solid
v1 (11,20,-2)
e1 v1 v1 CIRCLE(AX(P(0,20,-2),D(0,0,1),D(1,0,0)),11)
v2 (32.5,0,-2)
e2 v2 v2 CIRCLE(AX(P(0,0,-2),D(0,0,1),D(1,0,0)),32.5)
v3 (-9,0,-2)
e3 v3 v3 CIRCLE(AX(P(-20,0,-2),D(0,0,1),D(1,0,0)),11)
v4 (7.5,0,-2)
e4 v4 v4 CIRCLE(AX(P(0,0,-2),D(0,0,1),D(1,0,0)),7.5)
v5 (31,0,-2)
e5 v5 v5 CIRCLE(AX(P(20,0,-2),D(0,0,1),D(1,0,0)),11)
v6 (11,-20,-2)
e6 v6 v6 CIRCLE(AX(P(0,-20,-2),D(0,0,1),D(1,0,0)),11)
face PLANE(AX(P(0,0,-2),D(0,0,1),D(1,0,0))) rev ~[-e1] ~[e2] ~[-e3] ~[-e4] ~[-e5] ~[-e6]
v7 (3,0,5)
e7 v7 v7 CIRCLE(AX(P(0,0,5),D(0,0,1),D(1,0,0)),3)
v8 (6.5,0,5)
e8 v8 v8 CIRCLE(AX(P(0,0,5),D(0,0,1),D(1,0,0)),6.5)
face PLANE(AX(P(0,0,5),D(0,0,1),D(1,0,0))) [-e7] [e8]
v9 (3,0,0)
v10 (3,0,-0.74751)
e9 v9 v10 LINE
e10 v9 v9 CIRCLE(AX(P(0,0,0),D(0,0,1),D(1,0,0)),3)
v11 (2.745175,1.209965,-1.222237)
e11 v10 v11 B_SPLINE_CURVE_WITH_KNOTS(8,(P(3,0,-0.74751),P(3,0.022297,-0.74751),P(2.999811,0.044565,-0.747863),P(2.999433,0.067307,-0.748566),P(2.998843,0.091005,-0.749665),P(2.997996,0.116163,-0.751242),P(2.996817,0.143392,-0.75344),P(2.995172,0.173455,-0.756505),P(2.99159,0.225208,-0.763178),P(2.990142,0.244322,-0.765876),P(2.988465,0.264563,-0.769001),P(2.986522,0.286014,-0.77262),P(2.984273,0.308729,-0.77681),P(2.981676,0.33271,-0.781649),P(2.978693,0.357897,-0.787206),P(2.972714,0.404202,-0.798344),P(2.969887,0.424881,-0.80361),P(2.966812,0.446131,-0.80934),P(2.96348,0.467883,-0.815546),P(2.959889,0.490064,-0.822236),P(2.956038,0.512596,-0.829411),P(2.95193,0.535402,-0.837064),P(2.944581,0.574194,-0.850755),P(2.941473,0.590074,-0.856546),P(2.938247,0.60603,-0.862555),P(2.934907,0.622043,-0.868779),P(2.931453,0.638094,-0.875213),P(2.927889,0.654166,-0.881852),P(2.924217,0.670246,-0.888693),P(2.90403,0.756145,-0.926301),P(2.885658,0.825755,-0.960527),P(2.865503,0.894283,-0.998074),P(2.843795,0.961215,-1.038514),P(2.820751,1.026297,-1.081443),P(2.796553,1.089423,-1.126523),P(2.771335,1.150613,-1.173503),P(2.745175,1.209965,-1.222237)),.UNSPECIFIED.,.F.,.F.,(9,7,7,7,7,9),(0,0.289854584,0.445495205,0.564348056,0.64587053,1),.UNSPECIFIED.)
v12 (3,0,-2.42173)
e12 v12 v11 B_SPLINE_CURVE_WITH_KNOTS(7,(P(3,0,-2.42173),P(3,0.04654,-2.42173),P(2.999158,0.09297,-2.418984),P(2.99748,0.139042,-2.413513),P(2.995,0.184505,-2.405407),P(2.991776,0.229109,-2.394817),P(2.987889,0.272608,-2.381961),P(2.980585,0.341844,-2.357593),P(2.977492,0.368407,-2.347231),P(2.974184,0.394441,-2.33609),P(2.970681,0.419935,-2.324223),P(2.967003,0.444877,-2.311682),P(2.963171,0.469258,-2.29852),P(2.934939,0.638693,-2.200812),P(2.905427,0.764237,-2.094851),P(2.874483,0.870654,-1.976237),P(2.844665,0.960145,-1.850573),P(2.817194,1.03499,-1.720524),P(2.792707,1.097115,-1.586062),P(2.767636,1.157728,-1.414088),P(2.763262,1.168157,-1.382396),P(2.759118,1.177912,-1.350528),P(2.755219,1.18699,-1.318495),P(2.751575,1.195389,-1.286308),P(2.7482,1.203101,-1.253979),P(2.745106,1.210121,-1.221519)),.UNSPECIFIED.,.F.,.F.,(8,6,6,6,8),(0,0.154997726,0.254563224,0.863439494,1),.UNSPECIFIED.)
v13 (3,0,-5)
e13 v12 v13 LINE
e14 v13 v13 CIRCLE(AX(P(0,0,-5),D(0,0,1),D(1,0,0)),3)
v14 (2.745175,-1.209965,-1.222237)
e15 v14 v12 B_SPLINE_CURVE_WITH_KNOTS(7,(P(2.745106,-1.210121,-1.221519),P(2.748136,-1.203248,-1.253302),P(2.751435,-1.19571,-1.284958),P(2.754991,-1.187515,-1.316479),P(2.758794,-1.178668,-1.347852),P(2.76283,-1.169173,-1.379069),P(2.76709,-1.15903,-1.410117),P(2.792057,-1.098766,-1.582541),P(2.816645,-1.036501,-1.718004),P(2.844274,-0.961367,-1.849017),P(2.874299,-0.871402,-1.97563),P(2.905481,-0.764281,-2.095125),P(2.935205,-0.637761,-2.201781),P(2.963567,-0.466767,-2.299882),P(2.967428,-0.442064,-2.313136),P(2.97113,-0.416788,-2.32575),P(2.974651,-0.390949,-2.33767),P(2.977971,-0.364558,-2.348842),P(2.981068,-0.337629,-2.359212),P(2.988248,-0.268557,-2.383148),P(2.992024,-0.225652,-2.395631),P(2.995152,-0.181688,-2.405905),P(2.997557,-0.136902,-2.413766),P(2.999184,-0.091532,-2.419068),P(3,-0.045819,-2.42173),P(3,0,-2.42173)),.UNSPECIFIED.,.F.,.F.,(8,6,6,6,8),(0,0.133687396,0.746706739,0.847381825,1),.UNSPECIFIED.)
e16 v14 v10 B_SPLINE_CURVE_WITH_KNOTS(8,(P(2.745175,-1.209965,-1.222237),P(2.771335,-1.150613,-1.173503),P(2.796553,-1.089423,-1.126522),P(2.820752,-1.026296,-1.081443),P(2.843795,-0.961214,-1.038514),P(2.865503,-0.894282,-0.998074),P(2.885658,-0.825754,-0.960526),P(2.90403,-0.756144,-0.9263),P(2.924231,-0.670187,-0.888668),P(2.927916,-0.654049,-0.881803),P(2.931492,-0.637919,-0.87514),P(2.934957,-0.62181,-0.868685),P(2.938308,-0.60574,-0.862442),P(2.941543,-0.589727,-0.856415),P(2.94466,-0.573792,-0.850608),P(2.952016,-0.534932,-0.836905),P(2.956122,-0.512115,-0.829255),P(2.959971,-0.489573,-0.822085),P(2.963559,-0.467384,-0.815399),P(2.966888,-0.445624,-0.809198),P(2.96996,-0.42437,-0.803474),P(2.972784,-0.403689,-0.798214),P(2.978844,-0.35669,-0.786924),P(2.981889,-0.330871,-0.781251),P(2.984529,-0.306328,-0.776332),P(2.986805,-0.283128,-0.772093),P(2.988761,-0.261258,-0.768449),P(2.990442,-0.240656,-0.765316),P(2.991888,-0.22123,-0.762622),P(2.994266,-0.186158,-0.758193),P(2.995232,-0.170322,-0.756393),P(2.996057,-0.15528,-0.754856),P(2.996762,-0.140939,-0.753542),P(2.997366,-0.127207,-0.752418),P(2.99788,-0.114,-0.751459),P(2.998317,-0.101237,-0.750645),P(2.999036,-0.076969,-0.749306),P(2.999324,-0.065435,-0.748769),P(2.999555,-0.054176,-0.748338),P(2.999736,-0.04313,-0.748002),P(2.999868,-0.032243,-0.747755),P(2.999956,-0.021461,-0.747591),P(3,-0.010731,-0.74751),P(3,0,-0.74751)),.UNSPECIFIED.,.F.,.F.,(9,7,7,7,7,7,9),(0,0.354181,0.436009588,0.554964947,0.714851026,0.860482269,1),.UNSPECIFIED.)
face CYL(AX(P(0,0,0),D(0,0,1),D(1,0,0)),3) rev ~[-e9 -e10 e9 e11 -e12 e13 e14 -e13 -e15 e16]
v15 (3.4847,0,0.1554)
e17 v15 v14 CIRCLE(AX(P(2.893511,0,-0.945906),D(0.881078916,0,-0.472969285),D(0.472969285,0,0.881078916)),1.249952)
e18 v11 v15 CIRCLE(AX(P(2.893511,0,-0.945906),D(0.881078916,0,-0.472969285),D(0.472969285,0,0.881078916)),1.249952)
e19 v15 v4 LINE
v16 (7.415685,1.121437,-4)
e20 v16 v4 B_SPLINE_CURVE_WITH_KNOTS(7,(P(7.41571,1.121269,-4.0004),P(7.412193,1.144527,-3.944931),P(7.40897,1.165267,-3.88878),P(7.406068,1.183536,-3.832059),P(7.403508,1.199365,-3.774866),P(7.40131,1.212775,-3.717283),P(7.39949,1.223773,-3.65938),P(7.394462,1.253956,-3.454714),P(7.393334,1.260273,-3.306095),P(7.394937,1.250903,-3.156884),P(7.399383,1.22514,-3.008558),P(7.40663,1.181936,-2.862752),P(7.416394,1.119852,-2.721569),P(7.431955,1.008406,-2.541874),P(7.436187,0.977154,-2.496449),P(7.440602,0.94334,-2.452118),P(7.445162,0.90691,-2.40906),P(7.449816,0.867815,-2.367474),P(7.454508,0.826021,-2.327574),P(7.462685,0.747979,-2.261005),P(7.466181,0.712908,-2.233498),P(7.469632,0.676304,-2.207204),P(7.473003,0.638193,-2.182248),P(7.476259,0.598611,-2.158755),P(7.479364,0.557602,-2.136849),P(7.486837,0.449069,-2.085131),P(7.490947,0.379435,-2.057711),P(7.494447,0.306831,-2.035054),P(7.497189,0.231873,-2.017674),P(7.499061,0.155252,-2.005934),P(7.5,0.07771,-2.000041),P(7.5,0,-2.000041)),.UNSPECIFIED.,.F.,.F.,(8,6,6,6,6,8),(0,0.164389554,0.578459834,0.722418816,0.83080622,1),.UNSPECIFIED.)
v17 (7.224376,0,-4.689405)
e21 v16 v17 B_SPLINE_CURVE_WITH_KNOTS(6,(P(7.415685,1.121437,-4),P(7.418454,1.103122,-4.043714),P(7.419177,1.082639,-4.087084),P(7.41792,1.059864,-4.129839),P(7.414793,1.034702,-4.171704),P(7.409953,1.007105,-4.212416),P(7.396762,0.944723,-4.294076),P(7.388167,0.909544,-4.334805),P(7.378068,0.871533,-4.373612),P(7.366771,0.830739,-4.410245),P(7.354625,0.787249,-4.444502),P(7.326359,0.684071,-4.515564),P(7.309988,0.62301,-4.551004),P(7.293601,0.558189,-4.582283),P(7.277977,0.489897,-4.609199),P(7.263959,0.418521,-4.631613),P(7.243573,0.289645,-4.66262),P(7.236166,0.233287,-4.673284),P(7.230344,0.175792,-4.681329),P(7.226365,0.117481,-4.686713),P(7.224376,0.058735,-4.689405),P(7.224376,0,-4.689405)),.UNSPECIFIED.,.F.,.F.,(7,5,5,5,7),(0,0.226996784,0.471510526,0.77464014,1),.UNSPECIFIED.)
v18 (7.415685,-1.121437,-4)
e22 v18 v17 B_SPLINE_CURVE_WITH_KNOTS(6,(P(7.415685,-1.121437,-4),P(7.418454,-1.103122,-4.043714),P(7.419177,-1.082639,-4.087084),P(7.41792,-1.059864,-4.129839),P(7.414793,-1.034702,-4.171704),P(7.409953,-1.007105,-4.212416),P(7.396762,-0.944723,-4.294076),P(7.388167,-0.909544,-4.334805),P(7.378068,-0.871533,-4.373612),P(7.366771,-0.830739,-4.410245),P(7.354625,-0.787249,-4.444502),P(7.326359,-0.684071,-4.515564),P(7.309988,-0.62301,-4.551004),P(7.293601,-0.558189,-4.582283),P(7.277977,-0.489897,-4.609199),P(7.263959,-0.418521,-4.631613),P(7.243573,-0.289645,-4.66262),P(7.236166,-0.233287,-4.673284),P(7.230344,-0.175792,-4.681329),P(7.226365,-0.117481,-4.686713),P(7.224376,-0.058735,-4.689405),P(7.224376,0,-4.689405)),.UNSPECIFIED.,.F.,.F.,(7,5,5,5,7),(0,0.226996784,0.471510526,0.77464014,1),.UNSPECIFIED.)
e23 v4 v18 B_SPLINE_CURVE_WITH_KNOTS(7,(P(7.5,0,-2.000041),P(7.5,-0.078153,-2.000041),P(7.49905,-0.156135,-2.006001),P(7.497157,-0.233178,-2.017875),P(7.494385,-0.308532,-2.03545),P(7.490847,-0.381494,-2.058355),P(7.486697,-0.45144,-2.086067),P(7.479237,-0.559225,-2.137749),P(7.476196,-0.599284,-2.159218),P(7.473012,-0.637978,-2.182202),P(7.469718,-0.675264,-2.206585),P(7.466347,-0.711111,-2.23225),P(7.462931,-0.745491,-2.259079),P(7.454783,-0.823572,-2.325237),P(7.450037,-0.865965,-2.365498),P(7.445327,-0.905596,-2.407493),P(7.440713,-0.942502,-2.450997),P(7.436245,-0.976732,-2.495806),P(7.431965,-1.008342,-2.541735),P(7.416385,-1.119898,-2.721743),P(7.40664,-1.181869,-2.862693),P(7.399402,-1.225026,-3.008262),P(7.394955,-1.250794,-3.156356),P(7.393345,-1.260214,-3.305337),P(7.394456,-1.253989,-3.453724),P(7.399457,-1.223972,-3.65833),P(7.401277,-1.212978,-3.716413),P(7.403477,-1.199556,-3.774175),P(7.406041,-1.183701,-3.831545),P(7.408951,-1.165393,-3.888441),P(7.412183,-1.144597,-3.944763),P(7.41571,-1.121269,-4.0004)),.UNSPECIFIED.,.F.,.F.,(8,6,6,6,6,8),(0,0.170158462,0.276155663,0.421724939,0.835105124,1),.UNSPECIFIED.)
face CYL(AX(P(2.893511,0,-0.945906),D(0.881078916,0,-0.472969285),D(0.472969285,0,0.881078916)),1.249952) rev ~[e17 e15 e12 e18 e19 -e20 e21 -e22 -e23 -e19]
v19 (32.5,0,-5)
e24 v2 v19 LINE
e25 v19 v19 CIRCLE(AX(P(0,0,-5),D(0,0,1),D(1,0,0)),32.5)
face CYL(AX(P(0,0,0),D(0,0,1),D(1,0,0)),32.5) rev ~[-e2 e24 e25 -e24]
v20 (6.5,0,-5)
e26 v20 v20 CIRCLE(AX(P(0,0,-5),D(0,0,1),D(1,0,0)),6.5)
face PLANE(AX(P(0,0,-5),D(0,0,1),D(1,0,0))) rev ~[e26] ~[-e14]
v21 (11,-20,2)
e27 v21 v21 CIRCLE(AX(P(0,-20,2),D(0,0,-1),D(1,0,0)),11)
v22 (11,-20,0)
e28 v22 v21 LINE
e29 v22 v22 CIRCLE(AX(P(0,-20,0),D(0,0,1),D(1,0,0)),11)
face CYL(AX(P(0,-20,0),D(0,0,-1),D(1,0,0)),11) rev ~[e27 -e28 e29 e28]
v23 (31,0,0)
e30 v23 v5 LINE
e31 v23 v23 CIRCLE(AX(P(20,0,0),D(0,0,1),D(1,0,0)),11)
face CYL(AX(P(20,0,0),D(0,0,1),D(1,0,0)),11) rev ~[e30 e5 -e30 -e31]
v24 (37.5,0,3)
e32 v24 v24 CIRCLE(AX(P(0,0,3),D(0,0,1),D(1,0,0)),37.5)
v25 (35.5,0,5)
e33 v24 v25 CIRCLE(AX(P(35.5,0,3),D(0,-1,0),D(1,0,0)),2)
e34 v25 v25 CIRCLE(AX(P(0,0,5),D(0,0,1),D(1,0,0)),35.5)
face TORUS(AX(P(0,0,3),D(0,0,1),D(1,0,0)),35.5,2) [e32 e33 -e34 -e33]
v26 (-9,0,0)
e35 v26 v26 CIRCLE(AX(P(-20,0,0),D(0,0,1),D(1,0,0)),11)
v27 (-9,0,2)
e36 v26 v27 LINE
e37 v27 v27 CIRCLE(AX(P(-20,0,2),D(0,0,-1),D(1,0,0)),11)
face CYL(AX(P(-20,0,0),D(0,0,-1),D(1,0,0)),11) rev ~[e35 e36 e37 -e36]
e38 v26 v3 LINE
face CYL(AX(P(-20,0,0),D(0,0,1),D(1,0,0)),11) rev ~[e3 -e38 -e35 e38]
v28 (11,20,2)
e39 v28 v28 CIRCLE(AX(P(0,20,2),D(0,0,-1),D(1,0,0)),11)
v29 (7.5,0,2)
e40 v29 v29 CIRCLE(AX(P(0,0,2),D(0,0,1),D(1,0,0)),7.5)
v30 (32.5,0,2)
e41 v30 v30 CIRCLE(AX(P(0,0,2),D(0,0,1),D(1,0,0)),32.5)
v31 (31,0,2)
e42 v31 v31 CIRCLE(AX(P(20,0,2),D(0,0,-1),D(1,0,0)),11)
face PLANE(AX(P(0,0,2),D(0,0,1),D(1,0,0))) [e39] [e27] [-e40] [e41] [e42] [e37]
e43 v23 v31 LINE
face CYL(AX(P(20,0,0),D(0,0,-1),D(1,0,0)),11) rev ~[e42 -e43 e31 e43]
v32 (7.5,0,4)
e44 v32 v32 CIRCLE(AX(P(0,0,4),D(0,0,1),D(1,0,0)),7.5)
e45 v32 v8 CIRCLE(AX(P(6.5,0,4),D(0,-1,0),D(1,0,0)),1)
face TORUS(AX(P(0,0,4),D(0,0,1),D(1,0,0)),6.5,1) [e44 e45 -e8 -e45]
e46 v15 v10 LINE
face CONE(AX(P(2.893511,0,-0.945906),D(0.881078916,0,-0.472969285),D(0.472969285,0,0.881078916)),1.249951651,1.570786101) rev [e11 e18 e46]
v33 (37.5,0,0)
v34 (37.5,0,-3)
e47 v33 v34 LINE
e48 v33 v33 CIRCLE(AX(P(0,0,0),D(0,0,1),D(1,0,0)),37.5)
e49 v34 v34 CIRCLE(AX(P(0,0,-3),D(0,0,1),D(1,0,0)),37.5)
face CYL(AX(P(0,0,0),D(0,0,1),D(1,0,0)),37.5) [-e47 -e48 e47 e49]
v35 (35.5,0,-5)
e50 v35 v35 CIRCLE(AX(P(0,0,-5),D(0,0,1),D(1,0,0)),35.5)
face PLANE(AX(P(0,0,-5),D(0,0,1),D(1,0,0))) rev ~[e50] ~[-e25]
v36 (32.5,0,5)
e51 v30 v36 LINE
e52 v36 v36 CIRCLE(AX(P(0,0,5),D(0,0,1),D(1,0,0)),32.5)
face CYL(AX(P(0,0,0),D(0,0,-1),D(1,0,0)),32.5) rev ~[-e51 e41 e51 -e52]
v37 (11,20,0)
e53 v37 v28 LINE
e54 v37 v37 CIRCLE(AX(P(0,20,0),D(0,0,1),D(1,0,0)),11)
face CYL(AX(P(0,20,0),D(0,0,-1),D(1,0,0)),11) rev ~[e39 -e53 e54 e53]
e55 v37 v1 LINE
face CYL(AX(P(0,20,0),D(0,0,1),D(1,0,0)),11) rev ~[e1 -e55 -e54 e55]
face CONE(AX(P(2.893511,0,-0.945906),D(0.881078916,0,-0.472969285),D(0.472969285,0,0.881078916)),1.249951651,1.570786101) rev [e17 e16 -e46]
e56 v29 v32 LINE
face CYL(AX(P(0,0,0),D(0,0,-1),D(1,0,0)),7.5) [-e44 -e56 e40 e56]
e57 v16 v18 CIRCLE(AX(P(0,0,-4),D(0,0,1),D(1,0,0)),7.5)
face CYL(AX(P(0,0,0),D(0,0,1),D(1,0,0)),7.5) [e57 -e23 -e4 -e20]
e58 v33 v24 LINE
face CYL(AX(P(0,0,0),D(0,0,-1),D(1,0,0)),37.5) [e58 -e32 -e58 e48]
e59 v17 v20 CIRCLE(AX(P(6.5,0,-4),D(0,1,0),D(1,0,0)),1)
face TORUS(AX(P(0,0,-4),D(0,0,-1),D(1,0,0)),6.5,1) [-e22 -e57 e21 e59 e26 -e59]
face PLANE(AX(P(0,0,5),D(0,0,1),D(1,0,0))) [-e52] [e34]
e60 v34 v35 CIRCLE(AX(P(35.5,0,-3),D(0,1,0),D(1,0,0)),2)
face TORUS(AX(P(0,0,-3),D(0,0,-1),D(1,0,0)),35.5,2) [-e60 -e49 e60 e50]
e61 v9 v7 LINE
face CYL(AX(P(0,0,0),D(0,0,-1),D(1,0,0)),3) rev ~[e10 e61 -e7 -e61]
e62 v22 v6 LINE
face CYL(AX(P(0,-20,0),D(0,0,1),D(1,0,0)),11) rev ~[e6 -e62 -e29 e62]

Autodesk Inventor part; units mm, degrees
ref_plane "XZ Plane" through (0, 0, 0) normal (0, 1, 0) x (-1, 0, 0)
ref_plane "XY Plane" through (0, 0, 0) normal (0, 0, 1) x (1, 0, 0)
sketch "Esboço1" plane through (0, 0, 0) normal (0, 0, 1) x (1, 0, 0)
  circle A0 centre (0, 0) radius 37.5
  circle A1 centre (0, 0) radius 32.5
  circle A2 centre (0, 0) radius 20
  circle A3 centre (20, 0) radius 11
  circle A4 centre (0, 20) radius 11
  circle A5 centre (-20, 0) radius 11
  circle A6 centre (0, -20) radius 11
  circle A7 centre (0, 0) radius 7.5
  circle A8 centre (0, 0) radius 3
  dimension "d2" = 40
  dimension "d17" = 1
  dimension "d0" = 75
  dimension "d1" = 65
  dimension "d3" = 22
  dimension "d6" = 360
  dimension "d8" = 15
  dimension "d9" = 6
extrude "Extrusão1" add sketch "Esboço1" along normal mid plane 10 contours A0
extrude "Extrusão2" add sketch "Esboço1" along normal mid plane 4 contours A1 | A3 A2 A6 A5 A4
extrude "Extrusão3" add sketch "Esboço1" along normal mid plane 10 contours A7
fillet "Arredondamento1" radius 2 2 edges at (-37.5, 0, 5) (-37.5, 0, -5)
fillet "Arredondamento2" radius 1 2 edges at (-7.5, 0, 5) (-7.5, 0, -5)
sketch "Esboço2" plane through (0, 0, 2) normal (0, 0, 1) x (1, 0, 0)
  point P0 (0, 0)
  dimension "d17" = 1
ref_plane "Work Plane3" through (7.5, 0, 0) normal (1, 0, 0) x (0, 1, 0)
sketch "Sketch8" plane through (7.5, 0, 0) normal (1, 0, 0) x (0, 1, 0)
  line L0 (-7.5, -5) -> (7.5, -5) projected
  line L1 (7.5, -2) -> (-7.5, -2) projected
  line L2 (0, -2) -> (0, -4.5)
  circle A0 centre (0, -3.25) radius 1.25
  point P0 (0, 0)
  dimension "d17" = 1
  dimension "d34" = 2.5
sketch "Sketch9" plane through (0, 0, 0) normal (0, 1, 0) x (-1, 0, 0)
  line L0 (-3.4847, 0.1554) -> (-11.509, -4.1521)
  line L1 (-3, 5) -> (-3, -5) projected
  line L2 (-2.8935, -0.9459) -> (-10.9178, -5.2534)
  line L3 (-10.9178, -5.2534) -> (-11.509, -4.1521)
  line L4 (-3.4847, 0.1554) -> (-2.8935, -0.9459)
  point P0 (0, 0)
  point P1 (-7.5, -2)
  point P2 (-3, -1.0031)
  point P3 (-3, -0.7476)
  dimension "d40" = 1.25
revolve "Revolution1" cut sketch "Sketch9" angle 360 about axis through (2.8935, 0, -0.9459) along (0.8810792, 0, -0.4729688) contours L4 L1 L2 L3 L0
thread "Thread1" size "M2.5x0.45" class "6H" standard "ANSI Metric M Profile" full length
properties part number "fly_wheel" material "Aluminum 6061-AHC"
